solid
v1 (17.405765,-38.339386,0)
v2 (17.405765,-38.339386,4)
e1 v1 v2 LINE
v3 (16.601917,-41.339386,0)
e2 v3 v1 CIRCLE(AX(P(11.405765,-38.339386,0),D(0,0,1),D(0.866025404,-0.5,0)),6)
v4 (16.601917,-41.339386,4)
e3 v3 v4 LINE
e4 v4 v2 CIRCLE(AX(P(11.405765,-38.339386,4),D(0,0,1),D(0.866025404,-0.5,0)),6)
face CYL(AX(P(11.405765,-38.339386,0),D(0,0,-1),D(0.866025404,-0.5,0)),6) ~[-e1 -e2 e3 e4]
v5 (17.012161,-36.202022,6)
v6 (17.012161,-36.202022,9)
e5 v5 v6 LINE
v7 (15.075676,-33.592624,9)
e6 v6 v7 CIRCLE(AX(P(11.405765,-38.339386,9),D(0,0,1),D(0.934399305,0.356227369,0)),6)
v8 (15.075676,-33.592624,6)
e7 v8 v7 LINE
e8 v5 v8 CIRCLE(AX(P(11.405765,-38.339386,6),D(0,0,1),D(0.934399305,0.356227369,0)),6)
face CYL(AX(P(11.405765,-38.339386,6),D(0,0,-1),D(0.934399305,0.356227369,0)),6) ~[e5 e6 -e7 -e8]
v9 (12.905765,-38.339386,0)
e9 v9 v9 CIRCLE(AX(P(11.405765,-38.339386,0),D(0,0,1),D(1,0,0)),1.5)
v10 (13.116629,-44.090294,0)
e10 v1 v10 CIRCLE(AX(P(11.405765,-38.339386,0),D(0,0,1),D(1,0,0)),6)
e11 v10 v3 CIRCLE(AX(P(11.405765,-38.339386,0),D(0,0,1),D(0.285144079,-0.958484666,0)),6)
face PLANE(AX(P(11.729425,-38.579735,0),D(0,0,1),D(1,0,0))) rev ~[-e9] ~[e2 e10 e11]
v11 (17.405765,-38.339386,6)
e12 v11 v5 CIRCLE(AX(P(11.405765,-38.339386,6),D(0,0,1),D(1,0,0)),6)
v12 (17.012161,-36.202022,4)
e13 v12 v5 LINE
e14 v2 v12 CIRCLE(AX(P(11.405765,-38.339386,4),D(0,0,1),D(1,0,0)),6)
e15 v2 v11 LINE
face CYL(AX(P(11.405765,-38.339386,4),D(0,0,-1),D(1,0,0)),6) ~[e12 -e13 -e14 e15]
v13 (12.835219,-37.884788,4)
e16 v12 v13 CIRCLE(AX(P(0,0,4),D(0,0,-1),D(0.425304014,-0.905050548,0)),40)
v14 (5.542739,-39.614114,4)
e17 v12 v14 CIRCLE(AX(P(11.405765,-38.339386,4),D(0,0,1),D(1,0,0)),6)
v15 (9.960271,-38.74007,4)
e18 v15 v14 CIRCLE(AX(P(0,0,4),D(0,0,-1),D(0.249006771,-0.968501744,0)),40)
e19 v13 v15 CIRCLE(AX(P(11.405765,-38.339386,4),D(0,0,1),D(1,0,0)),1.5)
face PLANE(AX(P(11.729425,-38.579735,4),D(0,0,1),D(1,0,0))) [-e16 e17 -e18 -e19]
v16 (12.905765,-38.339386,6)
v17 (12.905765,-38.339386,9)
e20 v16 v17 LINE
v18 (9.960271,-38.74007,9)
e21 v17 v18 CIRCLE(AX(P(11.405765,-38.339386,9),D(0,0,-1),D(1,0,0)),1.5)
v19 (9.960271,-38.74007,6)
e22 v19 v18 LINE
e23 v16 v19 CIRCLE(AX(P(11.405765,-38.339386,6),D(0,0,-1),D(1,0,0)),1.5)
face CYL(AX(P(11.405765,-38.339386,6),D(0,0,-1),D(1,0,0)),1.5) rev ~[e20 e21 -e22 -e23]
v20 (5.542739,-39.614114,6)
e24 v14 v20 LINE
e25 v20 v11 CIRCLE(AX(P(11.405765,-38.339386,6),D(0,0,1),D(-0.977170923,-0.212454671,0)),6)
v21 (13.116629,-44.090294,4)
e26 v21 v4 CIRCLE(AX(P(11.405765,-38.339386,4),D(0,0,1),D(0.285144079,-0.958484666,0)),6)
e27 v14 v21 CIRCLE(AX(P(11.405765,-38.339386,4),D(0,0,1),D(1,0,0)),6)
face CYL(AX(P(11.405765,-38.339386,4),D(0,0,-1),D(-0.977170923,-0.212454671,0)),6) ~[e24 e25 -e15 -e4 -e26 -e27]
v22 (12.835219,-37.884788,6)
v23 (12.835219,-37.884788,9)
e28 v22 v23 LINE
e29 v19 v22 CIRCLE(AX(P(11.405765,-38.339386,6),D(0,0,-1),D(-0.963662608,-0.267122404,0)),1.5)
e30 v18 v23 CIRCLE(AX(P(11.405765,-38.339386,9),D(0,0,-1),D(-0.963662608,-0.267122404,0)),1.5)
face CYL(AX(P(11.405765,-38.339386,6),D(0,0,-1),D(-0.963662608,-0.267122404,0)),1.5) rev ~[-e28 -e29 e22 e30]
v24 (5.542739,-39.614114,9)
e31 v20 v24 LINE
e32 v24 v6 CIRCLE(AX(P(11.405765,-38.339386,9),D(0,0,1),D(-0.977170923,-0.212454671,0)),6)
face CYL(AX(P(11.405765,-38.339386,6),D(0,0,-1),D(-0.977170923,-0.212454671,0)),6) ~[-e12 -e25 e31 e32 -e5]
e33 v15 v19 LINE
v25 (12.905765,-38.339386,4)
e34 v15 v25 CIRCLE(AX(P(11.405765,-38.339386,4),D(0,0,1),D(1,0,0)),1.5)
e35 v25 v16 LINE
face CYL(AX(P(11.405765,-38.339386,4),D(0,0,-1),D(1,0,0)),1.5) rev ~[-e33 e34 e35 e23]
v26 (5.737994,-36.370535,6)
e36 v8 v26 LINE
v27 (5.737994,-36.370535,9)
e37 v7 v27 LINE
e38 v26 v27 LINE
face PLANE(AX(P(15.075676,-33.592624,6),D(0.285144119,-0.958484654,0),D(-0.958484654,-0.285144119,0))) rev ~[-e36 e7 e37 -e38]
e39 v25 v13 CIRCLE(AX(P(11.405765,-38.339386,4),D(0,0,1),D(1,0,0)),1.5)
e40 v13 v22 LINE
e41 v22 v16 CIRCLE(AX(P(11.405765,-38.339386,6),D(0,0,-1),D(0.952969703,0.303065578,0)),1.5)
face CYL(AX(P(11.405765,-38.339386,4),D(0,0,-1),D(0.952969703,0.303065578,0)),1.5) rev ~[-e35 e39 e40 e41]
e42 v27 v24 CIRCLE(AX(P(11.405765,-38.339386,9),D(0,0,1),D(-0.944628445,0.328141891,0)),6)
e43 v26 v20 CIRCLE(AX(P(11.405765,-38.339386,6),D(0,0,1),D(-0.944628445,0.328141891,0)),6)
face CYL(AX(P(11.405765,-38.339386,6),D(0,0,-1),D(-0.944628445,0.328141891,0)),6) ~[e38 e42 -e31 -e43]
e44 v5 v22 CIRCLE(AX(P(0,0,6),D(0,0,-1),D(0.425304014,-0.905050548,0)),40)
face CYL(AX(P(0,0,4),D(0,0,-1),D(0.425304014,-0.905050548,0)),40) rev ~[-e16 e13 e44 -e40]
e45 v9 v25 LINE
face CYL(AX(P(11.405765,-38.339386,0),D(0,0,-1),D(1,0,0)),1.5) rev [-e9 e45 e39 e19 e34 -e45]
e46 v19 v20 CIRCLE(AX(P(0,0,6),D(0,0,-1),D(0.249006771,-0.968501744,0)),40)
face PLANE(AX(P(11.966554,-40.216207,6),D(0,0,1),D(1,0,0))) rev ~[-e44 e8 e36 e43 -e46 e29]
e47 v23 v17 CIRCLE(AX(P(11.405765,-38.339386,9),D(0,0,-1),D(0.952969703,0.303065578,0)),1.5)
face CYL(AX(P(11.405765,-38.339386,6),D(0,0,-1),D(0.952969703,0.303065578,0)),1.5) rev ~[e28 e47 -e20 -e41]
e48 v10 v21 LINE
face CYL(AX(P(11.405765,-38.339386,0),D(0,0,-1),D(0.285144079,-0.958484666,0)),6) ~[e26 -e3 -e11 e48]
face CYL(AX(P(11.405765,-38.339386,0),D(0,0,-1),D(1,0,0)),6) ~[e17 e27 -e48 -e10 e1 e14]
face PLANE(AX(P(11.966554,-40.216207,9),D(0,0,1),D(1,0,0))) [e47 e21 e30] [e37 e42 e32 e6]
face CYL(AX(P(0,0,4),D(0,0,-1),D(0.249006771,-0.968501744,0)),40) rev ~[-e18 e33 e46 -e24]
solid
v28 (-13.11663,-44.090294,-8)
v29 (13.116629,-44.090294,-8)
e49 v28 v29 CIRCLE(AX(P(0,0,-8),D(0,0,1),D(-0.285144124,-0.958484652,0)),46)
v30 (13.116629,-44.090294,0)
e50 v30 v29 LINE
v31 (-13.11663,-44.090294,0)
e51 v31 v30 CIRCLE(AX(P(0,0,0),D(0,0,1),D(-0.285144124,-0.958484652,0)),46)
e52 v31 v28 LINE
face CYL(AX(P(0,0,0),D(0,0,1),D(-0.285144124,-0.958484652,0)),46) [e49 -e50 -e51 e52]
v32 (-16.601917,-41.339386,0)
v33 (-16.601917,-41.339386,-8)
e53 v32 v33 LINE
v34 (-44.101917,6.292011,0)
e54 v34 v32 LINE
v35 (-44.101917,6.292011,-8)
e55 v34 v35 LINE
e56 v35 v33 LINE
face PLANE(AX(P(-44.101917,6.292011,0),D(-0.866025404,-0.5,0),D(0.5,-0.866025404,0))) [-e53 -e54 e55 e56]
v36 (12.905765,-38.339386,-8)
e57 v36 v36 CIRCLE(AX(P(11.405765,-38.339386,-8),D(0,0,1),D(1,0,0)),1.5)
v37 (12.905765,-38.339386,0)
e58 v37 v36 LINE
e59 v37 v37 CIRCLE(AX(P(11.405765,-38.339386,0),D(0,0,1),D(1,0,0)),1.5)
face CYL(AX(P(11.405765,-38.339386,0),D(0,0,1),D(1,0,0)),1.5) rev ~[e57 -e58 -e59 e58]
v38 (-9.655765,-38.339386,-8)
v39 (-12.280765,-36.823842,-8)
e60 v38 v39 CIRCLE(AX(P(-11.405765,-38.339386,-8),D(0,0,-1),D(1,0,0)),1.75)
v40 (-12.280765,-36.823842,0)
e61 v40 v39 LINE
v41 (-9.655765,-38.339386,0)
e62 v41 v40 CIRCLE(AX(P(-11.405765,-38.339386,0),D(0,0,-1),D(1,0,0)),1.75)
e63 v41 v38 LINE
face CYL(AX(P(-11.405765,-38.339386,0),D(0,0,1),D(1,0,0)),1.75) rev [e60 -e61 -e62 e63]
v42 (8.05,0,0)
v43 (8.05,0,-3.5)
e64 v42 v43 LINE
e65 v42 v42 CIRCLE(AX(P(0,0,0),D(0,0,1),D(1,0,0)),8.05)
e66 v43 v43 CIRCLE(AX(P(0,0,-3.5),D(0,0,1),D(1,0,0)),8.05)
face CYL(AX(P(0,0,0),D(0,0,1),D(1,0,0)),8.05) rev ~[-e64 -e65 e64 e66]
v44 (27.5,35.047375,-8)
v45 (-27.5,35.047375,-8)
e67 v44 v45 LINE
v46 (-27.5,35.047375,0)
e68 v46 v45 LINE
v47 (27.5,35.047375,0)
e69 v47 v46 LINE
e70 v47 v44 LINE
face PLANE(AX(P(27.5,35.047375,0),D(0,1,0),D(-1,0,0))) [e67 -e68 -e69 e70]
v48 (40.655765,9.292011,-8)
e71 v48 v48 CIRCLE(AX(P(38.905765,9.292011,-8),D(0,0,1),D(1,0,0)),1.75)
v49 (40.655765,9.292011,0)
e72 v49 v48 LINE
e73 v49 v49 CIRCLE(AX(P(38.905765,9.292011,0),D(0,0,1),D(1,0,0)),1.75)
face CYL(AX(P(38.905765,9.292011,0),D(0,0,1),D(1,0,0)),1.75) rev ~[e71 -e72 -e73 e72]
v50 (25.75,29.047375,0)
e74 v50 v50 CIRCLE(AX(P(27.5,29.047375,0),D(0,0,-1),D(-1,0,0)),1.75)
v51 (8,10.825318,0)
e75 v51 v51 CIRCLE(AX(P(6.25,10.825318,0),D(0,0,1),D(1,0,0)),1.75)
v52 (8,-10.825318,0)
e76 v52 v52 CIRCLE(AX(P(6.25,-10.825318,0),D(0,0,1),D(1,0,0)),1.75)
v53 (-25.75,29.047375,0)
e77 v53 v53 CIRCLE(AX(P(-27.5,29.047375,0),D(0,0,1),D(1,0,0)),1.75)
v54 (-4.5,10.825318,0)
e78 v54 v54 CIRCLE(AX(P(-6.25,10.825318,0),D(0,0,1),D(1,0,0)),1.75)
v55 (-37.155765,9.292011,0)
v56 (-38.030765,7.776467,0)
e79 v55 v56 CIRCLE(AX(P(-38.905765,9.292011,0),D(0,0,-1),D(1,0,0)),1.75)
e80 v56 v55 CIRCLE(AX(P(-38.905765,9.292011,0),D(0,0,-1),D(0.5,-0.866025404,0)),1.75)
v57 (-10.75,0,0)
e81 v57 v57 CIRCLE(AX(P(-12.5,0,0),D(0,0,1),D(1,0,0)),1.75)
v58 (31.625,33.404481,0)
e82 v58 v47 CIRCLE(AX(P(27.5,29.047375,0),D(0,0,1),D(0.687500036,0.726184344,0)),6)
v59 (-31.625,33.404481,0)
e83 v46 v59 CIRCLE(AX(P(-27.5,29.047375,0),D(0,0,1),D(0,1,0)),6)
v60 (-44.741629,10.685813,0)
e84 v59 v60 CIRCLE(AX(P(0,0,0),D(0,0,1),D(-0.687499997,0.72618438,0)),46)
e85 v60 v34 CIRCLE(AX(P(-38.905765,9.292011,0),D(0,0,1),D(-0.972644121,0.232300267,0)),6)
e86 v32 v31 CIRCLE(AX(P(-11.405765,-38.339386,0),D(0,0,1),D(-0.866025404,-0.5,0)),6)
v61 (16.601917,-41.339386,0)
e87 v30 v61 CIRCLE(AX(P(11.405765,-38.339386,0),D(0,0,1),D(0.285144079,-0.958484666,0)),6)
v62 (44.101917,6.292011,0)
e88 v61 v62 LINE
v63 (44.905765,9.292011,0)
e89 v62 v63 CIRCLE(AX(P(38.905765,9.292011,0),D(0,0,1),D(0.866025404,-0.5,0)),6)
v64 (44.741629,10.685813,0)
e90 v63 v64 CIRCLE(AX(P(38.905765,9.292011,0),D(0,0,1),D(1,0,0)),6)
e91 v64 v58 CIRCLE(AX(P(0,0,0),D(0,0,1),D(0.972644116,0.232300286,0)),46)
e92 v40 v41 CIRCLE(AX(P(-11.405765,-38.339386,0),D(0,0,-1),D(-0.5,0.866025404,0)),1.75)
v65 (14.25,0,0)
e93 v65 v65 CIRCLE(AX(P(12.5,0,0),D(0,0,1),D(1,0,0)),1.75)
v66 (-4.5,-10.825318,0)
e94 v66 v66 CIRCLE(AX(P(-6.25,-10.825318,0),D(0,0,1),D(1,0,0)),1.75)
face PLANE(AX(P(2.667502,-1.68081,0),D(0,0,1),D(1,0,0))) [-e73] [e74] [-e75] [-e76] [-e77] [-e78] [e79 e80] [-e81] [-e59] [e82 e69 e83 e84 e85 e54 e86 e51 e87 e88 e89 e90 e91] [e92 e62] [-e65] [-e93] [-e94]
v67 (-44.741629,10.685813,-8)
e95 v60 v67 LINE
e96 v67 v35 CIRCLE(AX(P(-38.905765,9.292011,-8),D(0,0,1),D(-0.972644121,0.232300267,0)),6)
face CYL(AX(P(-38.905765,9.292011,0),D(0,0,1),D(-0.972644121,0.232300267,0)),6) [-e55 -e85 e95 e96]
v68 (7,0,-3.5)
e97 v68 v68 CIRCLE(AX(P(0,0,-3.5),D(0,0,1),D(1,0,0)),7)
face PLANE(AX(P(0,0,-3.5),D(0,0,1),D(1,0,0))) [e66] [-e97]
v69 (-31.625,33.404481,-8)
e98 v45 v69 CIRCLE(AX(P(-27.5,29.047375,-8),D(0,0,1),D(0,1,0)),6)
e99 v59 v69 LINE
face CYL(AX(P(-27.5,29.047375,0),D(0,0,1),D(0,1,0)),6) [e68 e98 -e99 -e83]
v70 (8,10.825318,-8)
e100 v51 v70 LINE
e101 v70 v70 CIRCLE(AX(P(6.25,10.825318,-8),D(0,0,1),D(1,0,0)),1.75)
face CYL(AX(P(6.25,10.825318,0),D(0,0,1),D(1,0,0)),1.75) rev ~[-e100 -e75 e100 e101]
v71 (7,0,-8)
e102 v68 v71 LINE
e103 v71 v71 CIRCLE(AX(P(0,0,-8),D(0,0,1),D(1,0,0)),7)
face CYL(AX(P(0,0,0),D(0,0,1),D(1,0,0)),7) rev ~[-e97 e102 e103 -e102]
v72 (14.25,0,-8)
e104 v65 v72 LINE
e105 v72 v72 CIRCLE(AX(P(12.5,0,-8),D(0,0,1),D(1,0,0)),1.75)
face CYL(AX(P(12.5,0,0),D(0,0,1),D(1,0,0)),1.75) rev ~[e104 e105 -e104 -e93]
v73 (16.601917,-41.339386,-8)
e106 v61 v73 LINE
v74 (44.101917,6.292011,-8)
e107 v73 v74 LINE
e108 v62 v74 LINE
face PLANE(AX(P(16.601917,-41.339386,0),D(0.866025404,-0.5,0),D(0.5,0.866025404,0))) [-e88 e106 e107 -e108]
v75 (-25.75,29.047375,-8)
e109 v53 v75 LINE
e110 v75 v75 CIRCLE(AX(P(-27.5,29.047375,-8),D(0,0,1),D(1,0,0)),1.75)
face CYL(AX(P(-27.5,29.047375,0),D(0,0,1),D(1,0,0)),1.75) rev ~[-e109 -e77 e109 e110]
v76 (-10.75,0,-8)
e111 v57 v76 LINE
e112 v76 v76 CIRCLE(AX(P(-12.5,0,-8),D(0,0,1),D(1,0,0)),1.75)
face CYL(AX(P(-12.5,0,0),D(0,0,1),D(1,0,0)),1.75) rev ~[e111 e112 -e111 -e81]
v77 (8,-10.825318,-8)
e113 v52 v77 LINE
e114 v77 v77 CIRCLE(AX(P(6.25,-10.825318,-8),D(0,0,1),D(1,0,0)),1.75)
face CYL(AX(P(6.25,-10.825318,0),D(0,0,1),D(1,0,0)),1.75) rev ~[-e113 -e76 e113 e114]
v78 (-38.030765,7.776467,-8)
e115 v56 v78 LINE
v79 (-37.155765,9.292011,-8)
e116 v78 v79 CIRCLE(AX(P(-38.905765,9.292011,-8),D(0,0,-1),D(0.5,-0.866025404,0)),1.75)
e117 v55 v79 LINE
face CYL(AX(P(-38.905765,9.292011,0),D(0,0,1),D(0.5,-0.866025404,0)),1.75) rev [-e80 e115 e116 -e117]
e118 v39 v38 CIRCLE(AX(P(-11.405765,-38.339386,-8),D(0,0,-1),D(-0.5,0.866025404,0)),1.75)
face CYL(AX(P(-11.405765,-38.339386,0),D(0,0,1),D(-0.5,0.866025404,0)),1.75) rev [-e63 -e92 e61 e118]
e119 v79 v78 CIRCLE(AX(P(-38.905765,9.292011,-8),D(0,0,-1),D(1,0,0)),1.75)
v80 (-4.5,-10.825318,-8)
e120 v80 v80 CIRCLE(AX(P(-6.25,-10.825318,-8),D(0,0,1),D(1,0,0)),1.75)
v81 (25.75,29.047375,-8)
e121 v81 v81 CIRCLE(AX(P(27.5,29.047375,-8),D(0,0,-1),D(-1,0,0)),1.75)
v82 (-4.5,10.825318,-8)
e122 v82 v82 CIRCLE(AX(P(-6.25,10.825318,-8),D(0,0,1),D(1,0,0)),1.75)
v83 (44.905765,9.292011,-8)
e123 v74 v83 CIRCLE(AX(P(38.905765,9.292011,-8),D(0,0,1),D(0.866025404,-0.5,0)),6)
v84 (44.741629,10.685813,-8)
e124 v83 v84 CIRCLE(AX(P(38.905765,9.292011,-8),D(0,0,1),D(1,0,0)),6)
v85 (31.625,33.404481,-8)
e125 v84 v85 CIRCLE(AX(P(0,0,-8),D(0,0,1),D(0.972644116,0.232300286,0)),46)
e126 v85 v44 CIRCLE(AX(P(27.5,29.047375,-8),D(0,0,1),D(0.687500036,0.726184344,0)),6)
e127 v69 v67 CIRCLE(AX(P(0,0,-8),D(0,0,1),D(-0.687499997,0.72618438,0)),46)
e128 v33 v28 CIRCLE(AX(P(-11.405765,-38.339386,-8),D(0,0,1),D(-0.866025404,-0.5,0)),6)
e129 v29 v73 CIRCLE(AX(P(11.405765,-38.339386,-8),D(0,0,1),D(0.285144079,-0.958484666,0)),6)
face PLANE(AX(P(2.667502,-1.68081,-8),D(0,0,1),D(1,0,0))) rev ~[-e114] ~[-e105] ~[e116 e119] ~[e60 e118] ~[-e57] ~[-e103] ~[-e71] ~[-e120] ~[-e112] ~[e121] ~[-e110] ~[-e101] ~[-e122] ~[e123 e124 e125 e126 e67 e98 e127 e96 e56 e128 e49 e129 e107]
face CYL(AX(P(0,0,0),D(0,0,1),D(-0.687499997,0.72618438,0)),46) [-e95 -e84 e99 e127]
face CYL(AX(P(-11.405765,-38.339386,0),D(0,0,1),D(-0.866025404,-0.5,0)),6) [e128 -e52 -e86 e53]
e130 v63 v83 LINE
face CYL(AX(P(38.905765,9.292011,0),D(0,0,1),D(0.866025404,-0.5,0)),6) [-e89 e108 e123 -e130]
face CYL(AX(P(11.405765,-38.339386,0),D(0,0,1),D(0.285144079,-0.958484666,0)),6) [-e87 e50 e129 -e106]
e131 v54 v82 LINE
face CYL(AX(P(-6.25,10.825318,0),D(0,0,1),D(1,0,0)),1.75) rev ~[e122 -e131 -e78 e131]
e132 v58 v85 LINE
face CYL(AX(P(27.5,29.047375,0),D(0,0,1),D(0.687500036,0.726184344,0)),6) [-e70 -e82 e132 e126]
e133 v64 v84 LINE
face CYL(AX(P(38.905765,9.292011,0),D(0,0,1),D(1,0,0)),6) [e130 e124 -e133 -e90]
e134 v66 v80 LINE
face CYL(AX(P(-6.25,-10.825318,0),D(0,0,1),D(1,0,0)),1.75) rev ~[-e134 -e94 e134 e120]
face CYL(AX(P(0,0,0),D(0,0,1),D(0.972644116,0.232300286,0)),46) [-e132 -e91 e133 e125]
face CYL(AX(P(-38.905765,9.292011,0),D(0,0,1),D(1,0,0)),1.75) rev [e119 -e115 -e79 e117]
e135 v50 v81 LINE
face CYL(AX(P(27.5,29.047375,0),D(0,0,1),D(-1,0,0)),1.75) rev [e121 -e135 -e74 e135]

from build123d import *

# Parameters (mm, degrees)
F0_R     = 1.75
F0_R_2   = 8.05
F0_R_3   = 1.5
F0_R_4   = 7
F1_DEPTH = 8
F2_DEPTH = 3.5
F3_DEPTH = 4
F5_DEPTH = 2
F7_DEPTH = 3


# Not quite as in the source:
# - a feature names something its author has since deleted; it is built from what else it names


with BuildPart() as f1:
    # F0 (on Top) → F1 (new body)
    with BuildSketch(Plane.XY):
        with BuildLine():
            ThreePointArc((-32.9057647469, 9.2920110558), (-33.7096123242, 6.2920110558), (-35.9057647469, 4.0958586331))
            Line((-35.9057647469, 4.0958586331), (-14.4057647469, -33.1432337296))
            ThreePointArc((-14.4057647469, -33.1432337296), (-8.4057647469, -33.1432337296), (-5.4057647469, -38.3393861523))
            ThreePointArc((-5.4057647469, -38.3393861523), (-7.8186481903, -43.1490217736), (-13.1166296833, -44.0902940084))
            ThreePointArc((-13.1166296833, -44.0902940084), (-2.42e-07, -46), (13.1166292194, -44.0902941464))
            ThreePointArc((13.1166292194, -44.0902941464), (6.5961292703, -34.7522694018), (17.4057647469, -38.3393861523))
            ThreePointArc((17.4057647469, -38.3393861523), (17.2013197046, -39.892300423), (16.6019171696, -41.3393861523))
            Line((16.6019171696, -41.3393861523), (44.1019171696, 6.2920110558))
            ThreePointArc((44.1019171696, 6.2920110558), (32.9683642938, 10.1564622456), (44.7416293579, 10.685813137))
            ThreePointArc((44.7416293579, 10.685813137), (39.8371685393, 23.0000000602), (31.6250002147, 33.4044811578))
            ThreePointArc((31.6250002147, 33.4044811578), (33.0113519797, 31.4190832059), (33.5, 29.0473750966))
            ThreePointArc((33.5, 29.0473750966), (27.5, 23.0473750966), (21.5, 29.0473750966))
            Line((21.5, 29.0473750966), (-21.5, 29.0473750966))
            ThreePointArc((-21.5, 29.0473750966), (-29.8717083356, 23.5360232142), (-31.624999857, 33.4044814964))
            ThreePointArc((-31.624999857, 33.4044814964), (-39.837168539, 23.0000000607), (-44.7416294721, 10.6858126589))
            ThreePointArc((-44.7416294721, 10.6858126589), (-38.2040484051, 15.2508359547), (-32.9057647469, 9.2920110558))
        make_face()
        with Locations((-6.25, -10.8253175473)):
            Circle(F0_R, mode=Mode.SUBTRACT)
        with Locations((6.25, -10.8253175473)):
            Circle(F0_R, mode=Mode.SUBTRACT)
        with Locations((-12.5, 0)):
            Circle(F0_R, mode=Mode.SUBTRACT)
        with Locations((-6.25, 10.8253175473)):
            Circle(F0_R, mode=Mode.SUBTRACT)
        Circle(F0_R_2, mode=Mode.SUBTRACT)
        with Locations((6.25, 10.8253175473)):
            Circle(F0_R, mode=Mode.SUBTRACT)
        with Locations((12.5, 0)):
            Circle(F0_R, mode=Mode.SUBTRACT)
        with BuildLine():
            Line((27.5, 35.0473750966), (-27.5, 35.0473750966))
            ThreePointArc((-27.5, 35.0473750966), (-23.2573593129, 33.2900157837), (-21.5, 29.0473750966))
            Line((-21.5, 29.0473750966), (21.5, 29.0473750966))
            ThreePointArc((21.5, 29.0473750966), (23.2573593129, 33.2900157837), (27.5, 35.0473750966))
        make_face()
        with BuildLine():
            ThreePointArc((-27.5, 35.0473750966), (-29.7200632424, 34.6215404331), (-31.624999857, 33.4044814964))
            ThreePointArc((-31.624999857, 33.4044814964), (-29.8717083356, 23.5360232142), (-21.5, 29.0473750966))
            ThreePointArc((-21.5, 29.0473750966), (-23.2573593129, 33.2900157837), (-27.5, 35.0473750966))
        make_face()
        with Locations((-27.5, 29.0473750966)):
            Circle(F0_R, mode=Mode.SUBTRACT)
        with BuildLine():
            ThreePointArc((33.5, 29.0473750966), (33.0113519797, 31.4190832059), (31.6250002147, 33.4044811578))
            ThreePointArc((31.6250002147, 33.4044811578), (29.7200634712, 34.621540342), (27.5, 35.0473750966))
            ThreePointArc((27.5, 35.0473750966), (23.2573593129, 33.2900157837), (21.5, 29.0473750966))
            ThreePointArc((21.5, 29.0473750966), (27.5, 23.0473750966), (33.5, 29.0473750966))
        make_face()
        with BuildLine():
            ThreePointArc((29.25, 29.0473750966), (27.5, 27.2973750966), (25.75, 29.0473750966))
            ThreePointArc((25.75, 29.0473750966), (27.5, 30.7973750966), (29.25, 29.0473750966))
        make_face(mode=Mode.SUBTRACT)
        with BuildLine():
            ThreePointArc((44.9057647469, 9.2920110558), (44.864589617, 9.9937276417), (44.7416293579, 10.685813137))
            ThreePointArc((44.7416293579, 10.685813137), (32.9683642938, 10.1564622456), (44.1019171696, 6.2920110558))
            ThreePointArc((44.1019171696, 6.2920110558), (44.7013197046, 7.7390967852), (44.9057647469, 9.2920110558))
        make_face()
        with Locations((38.9057647469, 9.2920110558)):
            Circle(F0_R, mode=Mode.SUBTRACT)
        with BuildLine():
            ThreePointArc((17.4057647469, -38.3393861523), (6.5961292703, -34.7522694018), (13.1166292194, -44.0902941464))
            ThreePointArc((13.1166292194, -44.0902941464), (15.1231017367, -43.049100125), (16.6019171696, -41.3393861523))
            ThreePointArc((16.6019171696, -41.3393861523), (17.2013197046, -39.892300423), (17.4057647469, -38.3393861523))
        make_face()
        with Locations((11.4057647469, -38.3393861523)):
            Circle(F0_R_3, mode=Mode.SUBTRACT)
        with BuildLine():
            ThreePointArc((-5.4057647469, -38.3393861523), (-8.4057647469, -33.1432337296), (-14.4057647469, -33.1432337296))
            ThreePointArc((-14.4057647469, -33.1432337296), (-17.2013197046, -36.7864718817), (-16.6019171696, -41.3393861523))
            ThreePointArc((-16.6019171696, -41.3393861523), (-15.1231019266, -43.0490999751), (-13.1166296833, -44.0902940084))
            ThreePointArc((-13.1166296833, -44.0902940084), (-7.8186481903, -43.1490217736), (-5.4057647469, -38.3393861523))
        make_face()
        with BuildLine():
            ThreePointArc((-9.6557647469, -38.3393861523), (-12.2807647469, -39.854930609), (-12.2807647469, -36.8238416957))
            ThreePointArc((-12.2807647469, -36.8238416957), (-10.5307647469, -36.8238416957), (-9.6557647469, -38.3393861523))
        make_face(mode=Mode.SUBTRACT)
        with BuildLine():
            Line((-14.4057647469, -33.1432337296), (-35.9057647469, 4.0958586331))
            ThreePointArc((-35.9057647469, 4.0958586331), (-40.4586790175, 3.4964560981), (-44.1019171696, 6.2920110558))
            Line((-44.1019171696, 6.2920110558), (-16.6019171696, -41.3393861523))
            ThreePointArc((-16.6019171696, -41.3393861523), (-17.2013197046, -36.7864718817), (-14.4057647469, -33.1432337296))
        make_face()
        with BuildLine():
            ThreePointArc((-44.1019171696, 6.2920110558), (-40.4586790175, 3.4964560981), (-35.9057647469, 4.0958586331))
            ThreePointArc((-35.9057647469, 4.0958586331), (-33.7096123242, 6.2920110558), (-32.9057647469, 9.2920110558))
            ThreePointArc((-32.9057647469, 9.2920110558), (-38.2040484051, 15.2508359547), (-44.7416294721, 10.6858126589))
            ThreePointArc((-44.7416294721, 10.6858126589), (-44.8431651646, 8.4275596228), (-44.1019171696, 6.2920110558))
        make_face()
        with BuildLine():
            ThreePointArc((-38.0307647469, 7.7764665992), (-40.4213092035, 10.1670110558), (-37.1557647469, 9.2920110558))
            ThreePointArc((-37.1557647469, 9.2920110558), (-37.3902202902, 8.4170110558), (-38.0307647469, 7.7764665992))
        make_face(mode=Mode.SUBTRACT)
        Circle(F0_R_2)
        Circle(F0_R_4, mode=Mode.SUBTRACT)
    extrude(amount=-F1_DEPTH)

    # F0 (on Top) → F2 (cut)
    with BuildSketch(Plane.XY):
        Circle(F0_R_2)
        Circle(F0_R_4, mode=Mode.SUBTRACT)
    extrude(amount=-F2_DEPTH, mode=Mode.SUBTRACT)


with BuildPart() as f3:
    # F0 (on Top) → F3 (new body)
    with BuildSketch(Plane.XY):
        with BuildLine():
            ThreePointArc((17.4057647469, -38.3393861523), (6.5961292703, -34.7522694018), (13.1166292194, -44.0902941464))
            ThreePointArc((13.1166292194, -44.0902941464), (15.1231017367, -43.049100125), (16.6019171696, -41.3393861523))
            ThreePointArc((16.6019171696, -41.3393861523), (17.2013197046, -39.892300423), (17.4057647469, -38.3393861523))
        make_face()
        with Locations((11.4057647469, -38.3393861523)):
            Circle(F0_R_3, mode=Mode.SUBTRACT)
    extrude(amount=F3_DEPTH)

    # F4 (on face) → F5 (join)
    with BuildSketch(Plane.XY.offset(4)):
        with BuildLine():
            ThreePointArc((9.9602708355, -38.7400697584), (7.7638146886, -39.2393065877), (5.5427392086, -39.6141141775))
            ThreePointArc((5.5427392086, -39.6141141775), (12.0467978079, -44.3050442564), (17.4057647469, -38.3393861523))
            ThreePointArc((17.4057647469, -38.3393861523), (17.3065432967, -37.2527341815), (17.0121605783, -36.2020219388))
            ThreePointArc((17.0121605783, -36.2020219388), (14.947389292, -37.1022311102), (12.8352193016, -37.8847877845))
            ThreePointArc((12.8352193016, -37.8847877845), (12.8880234679, -38.1093664054), (12.9057647469, -38.3393861523))
            ThreePointArc((12.9057647469, -38.3393861523), (11.607951706, -39.8256971674), (9.9602708355, -38.7400697584))
        make_face()
    extrude(amount=F5_DEPTH)

    # F6 (on face) → F7 (join)
    with BuildSketch(Plane.XY.offset(6)):
        with BuildLine():
            ThreePointArc((5.5427392086, -39.6141141775), (13.1166294589, -44.0902940752), (17.0121605783, -36.2020219388))
            ThreePointArc((17.0121605783, -36.2020219388), (14.947389292, -37.1022311102), (12.8352193016, -37.8847877845))
            ThreePointArc((12.8352193016, -37.8847877845), (12.8880234679, -38.1093664054), (12.9057647469, -38.3393861523))
            ThreePointArc((12.9057647469, -38.3393861523), (11.607951706, -39.8256971674), (9.9602708355, -38.7400697584))
            ThreePointArc((9.9602708355, -38.7400697584), (7.7638146886, -39.2393065877), (5.5427392086, -39.6141141775))
        make_face()
        with BuildLine():
            ThreePointArc((12.8352193016, -37.8847877845), (14.947389292, -37.1022311102), (17.0121605783, -36.2020219388))
            ThreePointArc((17.0121605783, -36.2020219388), (16.2239290423, -34.7637333696), (15.0756758433, -33.5926238301))
            Line((15.0756758433, -33.5926238301), (5.737994077, -36.3705348035))
            ThreePointArc((5.737994077, -36.3705348035), (5.4166064515, -37.9788547209), (5.5427392086, -39.6141141775))
            ThreePointArc((5.5427392086, -39.6141141775), (7.7638146886, -39.2393065877), (9.9602708355, -38.7400697584))
            ThreePointArc((9.9602708355, -38.7400697584), (10.9780485689, -36.9016591716), (12.8352193016, -37.8847877845))
        make_face()
    extrude(amount=F7_DEPTH)


solid = Compound([f1.part, f3.part])
